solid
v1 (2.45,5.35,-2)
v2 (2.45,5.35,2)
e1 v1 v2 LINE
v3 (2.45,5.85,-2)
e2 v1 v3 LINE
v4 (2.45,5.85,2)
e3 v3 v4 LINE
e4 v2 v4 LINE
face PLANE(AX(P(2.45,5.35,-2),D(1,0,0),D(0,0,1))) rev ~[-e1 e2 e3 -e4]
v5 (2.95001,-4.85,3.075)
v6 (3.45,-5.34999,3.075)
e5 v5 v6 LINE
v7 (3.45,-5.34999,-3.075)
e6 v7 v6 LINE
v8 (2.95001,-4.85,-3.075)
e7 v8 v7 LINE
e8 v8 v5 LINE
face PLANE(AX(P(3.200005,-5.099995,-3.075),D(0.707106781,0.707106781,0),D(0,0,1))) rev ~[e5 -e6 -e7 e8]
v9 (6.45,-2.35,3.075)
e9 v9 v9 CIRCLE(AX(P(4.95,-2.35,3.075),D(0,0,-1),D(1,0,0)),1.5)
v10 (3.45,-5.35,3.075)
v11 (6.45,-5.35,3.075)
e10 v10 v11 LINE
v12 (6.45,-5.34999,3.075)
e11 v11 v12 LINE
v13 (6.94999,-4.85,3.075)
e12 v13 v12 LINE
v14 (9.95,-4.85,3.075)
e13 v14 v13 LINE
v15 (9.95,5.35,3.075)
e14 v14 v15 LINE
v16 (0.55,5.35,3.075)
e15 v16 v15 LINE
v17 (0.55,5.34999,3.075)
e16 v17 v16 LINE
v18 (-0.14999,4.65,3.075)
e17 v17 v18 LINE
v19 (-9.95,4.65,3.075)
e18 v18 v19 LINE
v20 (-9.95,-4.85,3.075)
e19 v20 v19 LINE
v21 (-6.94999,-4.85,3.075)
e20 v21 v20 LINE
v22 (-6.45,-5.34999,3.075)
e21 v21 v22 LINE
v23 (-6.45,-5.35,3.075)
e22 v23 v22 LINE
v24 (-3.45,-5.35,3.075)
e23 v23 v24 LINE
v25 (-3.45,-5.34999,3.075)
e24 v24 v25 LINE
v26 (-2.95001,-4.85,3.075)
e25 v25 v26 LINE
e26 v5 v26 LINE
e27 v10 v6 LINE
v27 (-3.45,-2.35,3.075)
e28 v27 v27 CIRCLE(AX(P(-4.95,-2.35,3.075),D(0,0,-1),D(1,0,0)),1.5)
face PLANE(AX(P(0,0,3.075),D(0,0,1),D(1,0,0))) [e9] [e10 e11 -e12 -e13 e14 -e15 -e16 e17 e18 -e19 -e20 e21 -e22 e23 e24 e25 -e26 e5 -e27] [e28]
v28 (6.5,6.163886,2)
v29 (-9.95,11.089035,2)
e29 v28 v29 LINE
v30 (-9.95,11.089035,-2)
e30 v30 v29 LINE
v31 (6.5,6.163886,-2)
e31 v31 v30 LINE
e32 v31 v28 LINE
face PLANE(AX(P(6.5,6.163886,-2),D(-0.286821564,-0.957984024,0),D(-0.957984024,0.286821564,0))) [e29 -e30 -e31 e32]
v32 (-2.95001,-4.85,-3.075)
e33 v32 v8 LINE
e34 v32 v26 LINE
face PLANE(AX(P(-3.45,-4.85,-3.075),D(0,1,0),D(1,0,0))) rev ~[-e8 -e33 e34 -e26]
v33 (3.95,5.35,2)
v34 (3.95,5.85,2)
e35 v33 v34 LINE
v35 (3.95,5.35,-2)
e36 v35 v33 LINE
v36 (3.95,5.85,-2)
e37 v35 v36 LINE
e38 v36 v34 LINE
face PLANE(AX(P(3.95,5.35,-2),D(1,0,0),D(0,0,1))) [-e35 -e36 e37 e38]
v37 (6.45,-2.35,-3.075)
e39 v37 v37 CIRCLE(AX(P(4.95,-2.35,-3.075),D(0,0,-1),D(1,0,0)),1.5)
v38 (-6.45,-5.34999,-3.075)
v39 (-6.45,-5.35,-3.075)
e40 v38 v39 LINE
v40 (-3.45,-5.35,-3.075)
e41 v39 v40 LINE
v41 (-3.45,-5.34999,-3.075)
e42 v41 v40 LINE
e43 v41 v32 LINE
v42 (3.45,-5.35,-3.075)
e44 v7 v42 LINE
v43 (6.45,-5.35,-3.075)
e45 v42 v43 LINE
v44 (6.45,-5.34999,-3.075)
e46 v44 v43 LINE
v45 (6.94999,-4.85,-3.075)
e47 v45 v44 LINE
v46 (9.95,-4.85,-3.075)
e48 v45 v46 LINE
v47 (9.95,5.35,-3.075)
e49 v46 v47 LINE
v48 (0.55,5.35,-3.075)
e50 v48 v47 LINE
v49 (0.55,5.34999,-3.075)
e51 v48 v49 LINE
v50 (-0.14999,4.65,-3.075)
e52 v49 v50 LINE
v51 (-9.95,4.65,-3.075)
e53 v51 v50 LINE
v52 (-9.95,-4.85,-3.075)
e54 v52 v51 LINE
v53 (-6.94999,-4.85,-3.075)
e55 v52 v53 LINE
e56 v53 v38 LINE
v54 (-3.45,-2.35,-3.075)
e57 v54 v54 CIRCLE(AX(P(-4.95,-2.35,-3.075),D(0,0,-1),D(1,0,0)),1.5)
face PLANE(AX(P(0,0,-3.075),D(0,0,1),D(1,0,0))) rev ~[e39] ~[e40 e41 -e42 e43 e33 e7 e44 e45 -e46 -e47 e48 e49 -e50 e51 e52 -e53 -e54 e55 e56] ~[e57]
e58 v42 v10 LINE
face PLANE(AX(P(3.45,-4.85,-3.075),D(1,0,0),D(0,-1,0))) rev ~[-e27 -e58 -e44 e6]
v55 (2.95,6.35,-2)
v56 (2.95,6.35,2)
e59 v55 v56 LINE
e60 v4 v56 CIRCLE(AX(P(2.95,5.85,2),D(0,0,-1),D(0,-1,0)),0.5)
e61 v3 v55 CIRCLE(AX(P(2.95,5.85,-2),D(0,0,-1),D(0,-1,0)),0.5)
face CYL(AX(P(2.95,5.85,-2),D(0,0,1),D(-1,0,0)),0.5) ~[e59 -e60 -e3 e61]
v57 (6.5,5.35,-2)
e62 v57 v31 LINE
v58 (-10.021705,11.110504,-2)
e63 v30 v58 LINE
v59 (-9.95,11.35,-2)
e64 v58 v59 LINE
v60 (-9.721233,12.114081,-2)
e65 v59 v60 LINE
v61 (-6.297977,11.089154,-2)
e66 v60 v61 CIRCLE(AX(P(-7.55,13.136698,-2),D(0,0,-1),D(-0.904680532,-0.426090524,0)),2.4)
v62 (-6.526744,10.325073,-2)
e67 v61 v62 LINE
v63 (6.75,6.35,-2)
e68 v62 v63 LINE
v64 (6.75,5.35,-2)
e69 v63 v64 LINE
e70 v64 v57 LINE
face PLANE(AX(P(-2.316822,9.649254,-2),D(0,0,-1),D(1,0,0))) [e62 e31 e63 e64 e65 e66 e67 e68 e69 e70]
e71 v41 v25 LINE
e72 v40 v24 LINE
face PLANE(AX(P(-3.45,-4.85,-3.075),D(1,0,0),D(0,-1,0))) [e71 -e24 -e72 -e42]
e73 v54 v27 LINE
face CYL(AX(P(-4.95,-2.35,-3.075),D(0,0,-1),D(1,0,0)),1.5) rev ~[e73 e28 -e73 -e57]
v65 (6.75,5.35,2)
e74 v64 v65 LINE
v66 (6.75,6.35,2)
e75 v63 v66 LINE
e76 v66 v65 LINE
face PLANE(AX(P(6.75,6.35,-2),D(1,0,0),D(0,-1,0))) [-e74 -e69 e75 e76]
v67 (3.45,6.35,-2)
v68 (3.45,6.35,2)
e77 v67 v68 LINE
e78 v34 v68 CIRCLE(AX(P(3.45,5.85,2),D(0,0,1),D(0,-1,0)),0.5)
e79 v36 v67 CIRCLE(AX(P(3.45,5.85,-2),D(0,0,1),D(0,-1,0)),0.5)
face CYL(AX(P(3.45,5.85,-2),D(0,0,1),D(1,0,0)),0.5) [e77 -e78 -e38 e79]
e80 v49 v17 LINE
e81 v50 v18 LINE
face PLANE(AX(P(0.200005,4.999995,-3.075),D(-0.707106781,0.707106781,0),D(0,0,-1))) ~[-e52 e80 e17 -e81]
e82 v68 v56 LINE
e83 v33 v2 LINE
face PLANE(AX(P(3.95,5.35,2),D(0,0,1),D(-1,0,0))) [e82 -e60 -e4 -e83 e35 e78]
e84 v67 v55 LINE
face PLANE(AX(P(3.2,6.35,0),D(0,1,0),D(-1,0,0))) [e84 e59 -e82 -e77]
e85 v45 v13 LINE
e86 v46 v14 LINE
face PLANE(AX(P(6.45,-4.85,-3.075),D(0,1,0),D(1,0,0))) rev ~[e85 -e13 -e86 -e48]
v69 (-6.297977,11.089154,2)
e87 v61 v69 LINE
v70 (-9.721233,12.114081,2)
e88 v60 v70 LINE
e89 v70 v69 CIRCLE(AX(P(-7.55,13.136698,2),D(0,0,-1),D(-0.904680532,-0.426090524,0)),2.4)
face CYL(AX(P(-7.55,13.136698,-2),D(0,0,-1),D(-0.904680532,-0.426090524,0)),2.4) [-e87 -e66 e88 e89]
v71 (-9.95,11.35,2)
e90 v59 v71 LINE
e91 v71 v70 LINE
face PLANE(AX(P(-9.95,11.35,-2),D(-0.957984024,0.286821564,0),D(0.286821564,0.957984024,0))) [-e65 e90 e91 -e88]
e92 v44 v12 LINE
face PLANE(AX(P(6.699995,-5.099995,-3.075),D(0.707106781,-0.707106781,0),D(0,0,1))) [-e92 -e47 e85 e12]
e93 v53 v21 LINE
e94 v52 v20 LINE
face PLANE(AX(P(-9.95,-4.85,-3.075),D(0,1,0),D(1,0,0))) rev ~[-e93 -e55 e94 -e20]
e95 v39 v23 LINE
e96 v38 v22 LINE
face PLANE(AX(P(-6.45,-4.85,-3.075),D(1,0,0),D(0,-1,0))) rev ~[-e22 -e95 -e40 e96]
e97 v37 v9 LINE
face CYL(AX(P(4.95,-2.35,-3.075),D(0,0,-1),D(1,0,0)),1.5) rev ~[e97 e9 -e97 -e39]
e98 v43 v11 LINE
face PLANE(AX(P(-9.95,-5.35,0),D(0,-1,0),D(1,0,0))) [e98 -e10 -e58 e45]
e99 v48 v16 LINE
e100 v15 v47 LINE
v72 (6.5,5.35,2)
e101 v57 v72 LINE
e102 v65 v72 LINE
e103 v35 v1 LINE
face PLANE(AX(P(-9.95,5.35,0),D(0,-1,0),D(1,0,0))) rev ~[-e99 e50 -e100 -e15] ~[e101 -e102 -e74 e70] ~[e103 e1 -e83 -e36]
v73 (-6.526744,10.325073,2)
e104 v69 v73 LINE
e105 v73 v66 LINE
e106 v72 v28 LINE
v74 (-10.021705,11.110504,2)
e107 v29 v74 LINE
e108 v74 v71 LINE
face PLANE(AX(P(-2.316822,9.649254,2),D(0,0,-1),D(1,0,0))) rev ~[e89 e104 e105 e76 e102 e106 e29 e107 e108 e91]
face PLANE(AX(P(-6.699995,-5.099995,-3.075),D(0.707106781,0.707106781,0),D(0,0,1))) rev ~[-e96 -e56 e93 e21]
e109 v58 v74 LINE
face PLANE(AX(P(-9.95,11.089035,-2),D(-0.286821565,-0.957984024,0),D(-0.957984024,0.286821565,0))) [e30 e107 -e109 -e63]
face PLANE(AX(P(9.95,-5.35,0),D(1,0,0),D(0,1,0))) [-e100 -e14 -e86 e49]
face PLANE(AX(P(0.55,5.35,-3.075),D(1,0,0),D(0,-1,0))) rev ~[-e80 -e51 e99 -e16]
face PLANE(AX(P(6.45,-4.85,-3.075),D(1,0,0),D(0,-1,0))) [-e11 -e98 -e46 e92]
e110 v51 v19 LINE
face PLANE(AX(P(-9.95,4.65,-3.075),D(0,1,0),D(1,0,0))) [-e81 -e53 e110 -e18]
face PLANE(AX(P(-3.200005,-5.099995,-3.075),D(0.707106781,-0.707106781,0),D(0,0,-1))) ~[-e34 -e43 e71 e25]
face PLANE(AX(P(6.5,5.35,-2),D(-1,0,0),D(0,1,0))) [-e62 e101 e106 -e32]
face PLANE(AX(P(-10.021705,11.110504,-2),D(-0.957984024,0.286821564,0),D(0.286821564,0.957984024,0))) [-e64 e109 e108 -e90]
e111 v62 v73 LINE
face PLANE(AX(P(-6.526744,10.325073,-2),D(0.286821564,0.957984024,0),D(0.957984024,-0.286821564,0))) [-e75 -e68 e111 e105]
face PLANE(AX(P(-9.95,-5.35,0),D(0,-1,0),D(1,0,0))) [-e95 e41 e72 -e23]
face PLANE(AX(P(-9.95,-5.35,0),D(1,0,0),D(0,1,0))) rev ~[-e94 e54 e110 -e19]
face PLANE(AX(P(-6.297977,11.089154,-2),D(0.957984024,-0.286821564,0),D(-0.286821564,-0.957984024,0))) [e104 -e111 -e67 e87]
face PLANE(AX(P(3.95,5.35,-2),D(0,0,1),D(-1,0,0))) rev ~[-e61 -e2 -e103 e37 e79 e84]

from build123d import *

# Parameters (mm, degrees)
F0_W          = 19.9
F0_H          = 10.7
F1_DEPTH      = 3.075
F1_DEPTH_BACK = 3.075
F2_W          = 1.5
F2_H          = 4
F3_DEPTH      = 1
F4_R          = 0.5
F6_DEPTH      = 4
F7_W          = 10.5
F7_H          = 0.7
F7_W_2        = 3.5
F7_H_2        = 0.5
F7_W_3        = 6.9
F7_R          = 1.5
F8_DEPTH      = 25
F9_SIZE       = 0.69999
F10_SIZE      = 0.49999


# Not quite as in the source:
# - a fillet or chamfer is up to 0.001 mm smaller than in the source, because OpenCascade refuses the exact size


with BuildPart() as f1:
    # F0 (on Top) → F1 (new body, two sides)
    with BuildSketch(Plane.XY) as f1_sk:
        Rectangle(F0_W, F0_H)
    extrude(amount=F1_DEPTH)
    extrude(f1_sk.sketch, amount=-F1_DEPTH_BACK)

    # F2 (on face) → F3 (join)
    with BuildSketch(Plane(origin=(0, 5.35, 0), x_dir=(-1, 0, 0), z_dir=(0, 1, 0))):
        with Locations((-3.2, 0)):
            Rectangle(F2_W, F2_H)
    extrude(amount=F3_DEPTH)

    # F4
    f4_edges = [f1.edges().sort_by_distance(p)[0] for p in [
        (2.45, 6.35, 0),
        (3.95, 6.35, 0),
    ]]
    fillet(f4_edges, radius=F4_R)

    # F5 (on face) → F6 (join)
    with BuildSketch(Plane(origin=(0, 0, -2), x_dir=(1, 0, 0), z_dir=(0, 0, -1))):
        with BuildLine():
            Line((6.75, -6.35), (6.75, -5.35))
            Line((6.75, -5.35), (6.5, -5.35))
            Line((6.5, -5.35), (6.5, -6.1638856134))
            Line((6.5, -6.1638856134), (-9.95, -11.089035314))
            Line((-9.95, -11.089035314), (-10.021705391, -11.110503994))
            Line((-10.021705391, -11.110503994), (-9.95, -11.35))
            Line((-9.95, -11.35), (-9.7212332774, -12.1140808536))
            ThreePointArc((-9.7212332774, -12.1140808536), (-6.8616282462, -15.4358597688), (-6.297976785, -11.08915376))
            Line((-6.297976785, -11.08915376), (-6.5267435076, -10.3250729065))
            Line((-6.5267435076, -10.3250729065), (6.75, -6.35))
        make_face()
    extrude(amount=-F6_DEPTH)

    # F7 (on face) → F8 (cut)
    with BuildSketch(Plane(origin=(0, 0, -3.075), x_dir=(1, 0, 0), z_dir=(0, 0, -1))):
        with Locations((-4.7, -5)):
            Rectangle(F7_W, F7_H)
        with Locations((-8.2, 5.1)):
            Rectangle(F7_W_2, F7_H_2)
        with Locations((8.2, 5.1)):
            Rectangle(F7_W_2, F7_H_2)
        with Locations((0, 5.1)):
            Rectangle(F7_W_3, F7_H_2)
        with Locations((4.95, 2.35)):
            Circle(F7_R)
        with Locations((-4.95, 2.35)):
            Circle(F7_R)
    extrude(amount=-F8_DEPTH, mode=Mode.SUBTRACT)

    # F9 (size 0.7 in the source; OpenCascade refuses exactly that, so slightly less here)
    f9_edges = [f1.edges().sort_by_distance(p)[0] for p in [
        (0.55, 4.65, 0),
    ]]
    chamfer(f9_edges, length=F9_SIZE)

    # F10 (size 0.5 in the source; OpenCascade refuses exactly that, so slightly less here)
    f10_edges = [f1.edges().sort_by_distance(p)[0] for p in [
        (6.45, -4.85, 0),
        (3.45, -4.85, 0),
        (-3.45, -4.85, 0),
        (-6.45, -4.85, 0),
    ]]
    chamfer(f10_edges, length=F10_SIZE)


solid = f1.part
